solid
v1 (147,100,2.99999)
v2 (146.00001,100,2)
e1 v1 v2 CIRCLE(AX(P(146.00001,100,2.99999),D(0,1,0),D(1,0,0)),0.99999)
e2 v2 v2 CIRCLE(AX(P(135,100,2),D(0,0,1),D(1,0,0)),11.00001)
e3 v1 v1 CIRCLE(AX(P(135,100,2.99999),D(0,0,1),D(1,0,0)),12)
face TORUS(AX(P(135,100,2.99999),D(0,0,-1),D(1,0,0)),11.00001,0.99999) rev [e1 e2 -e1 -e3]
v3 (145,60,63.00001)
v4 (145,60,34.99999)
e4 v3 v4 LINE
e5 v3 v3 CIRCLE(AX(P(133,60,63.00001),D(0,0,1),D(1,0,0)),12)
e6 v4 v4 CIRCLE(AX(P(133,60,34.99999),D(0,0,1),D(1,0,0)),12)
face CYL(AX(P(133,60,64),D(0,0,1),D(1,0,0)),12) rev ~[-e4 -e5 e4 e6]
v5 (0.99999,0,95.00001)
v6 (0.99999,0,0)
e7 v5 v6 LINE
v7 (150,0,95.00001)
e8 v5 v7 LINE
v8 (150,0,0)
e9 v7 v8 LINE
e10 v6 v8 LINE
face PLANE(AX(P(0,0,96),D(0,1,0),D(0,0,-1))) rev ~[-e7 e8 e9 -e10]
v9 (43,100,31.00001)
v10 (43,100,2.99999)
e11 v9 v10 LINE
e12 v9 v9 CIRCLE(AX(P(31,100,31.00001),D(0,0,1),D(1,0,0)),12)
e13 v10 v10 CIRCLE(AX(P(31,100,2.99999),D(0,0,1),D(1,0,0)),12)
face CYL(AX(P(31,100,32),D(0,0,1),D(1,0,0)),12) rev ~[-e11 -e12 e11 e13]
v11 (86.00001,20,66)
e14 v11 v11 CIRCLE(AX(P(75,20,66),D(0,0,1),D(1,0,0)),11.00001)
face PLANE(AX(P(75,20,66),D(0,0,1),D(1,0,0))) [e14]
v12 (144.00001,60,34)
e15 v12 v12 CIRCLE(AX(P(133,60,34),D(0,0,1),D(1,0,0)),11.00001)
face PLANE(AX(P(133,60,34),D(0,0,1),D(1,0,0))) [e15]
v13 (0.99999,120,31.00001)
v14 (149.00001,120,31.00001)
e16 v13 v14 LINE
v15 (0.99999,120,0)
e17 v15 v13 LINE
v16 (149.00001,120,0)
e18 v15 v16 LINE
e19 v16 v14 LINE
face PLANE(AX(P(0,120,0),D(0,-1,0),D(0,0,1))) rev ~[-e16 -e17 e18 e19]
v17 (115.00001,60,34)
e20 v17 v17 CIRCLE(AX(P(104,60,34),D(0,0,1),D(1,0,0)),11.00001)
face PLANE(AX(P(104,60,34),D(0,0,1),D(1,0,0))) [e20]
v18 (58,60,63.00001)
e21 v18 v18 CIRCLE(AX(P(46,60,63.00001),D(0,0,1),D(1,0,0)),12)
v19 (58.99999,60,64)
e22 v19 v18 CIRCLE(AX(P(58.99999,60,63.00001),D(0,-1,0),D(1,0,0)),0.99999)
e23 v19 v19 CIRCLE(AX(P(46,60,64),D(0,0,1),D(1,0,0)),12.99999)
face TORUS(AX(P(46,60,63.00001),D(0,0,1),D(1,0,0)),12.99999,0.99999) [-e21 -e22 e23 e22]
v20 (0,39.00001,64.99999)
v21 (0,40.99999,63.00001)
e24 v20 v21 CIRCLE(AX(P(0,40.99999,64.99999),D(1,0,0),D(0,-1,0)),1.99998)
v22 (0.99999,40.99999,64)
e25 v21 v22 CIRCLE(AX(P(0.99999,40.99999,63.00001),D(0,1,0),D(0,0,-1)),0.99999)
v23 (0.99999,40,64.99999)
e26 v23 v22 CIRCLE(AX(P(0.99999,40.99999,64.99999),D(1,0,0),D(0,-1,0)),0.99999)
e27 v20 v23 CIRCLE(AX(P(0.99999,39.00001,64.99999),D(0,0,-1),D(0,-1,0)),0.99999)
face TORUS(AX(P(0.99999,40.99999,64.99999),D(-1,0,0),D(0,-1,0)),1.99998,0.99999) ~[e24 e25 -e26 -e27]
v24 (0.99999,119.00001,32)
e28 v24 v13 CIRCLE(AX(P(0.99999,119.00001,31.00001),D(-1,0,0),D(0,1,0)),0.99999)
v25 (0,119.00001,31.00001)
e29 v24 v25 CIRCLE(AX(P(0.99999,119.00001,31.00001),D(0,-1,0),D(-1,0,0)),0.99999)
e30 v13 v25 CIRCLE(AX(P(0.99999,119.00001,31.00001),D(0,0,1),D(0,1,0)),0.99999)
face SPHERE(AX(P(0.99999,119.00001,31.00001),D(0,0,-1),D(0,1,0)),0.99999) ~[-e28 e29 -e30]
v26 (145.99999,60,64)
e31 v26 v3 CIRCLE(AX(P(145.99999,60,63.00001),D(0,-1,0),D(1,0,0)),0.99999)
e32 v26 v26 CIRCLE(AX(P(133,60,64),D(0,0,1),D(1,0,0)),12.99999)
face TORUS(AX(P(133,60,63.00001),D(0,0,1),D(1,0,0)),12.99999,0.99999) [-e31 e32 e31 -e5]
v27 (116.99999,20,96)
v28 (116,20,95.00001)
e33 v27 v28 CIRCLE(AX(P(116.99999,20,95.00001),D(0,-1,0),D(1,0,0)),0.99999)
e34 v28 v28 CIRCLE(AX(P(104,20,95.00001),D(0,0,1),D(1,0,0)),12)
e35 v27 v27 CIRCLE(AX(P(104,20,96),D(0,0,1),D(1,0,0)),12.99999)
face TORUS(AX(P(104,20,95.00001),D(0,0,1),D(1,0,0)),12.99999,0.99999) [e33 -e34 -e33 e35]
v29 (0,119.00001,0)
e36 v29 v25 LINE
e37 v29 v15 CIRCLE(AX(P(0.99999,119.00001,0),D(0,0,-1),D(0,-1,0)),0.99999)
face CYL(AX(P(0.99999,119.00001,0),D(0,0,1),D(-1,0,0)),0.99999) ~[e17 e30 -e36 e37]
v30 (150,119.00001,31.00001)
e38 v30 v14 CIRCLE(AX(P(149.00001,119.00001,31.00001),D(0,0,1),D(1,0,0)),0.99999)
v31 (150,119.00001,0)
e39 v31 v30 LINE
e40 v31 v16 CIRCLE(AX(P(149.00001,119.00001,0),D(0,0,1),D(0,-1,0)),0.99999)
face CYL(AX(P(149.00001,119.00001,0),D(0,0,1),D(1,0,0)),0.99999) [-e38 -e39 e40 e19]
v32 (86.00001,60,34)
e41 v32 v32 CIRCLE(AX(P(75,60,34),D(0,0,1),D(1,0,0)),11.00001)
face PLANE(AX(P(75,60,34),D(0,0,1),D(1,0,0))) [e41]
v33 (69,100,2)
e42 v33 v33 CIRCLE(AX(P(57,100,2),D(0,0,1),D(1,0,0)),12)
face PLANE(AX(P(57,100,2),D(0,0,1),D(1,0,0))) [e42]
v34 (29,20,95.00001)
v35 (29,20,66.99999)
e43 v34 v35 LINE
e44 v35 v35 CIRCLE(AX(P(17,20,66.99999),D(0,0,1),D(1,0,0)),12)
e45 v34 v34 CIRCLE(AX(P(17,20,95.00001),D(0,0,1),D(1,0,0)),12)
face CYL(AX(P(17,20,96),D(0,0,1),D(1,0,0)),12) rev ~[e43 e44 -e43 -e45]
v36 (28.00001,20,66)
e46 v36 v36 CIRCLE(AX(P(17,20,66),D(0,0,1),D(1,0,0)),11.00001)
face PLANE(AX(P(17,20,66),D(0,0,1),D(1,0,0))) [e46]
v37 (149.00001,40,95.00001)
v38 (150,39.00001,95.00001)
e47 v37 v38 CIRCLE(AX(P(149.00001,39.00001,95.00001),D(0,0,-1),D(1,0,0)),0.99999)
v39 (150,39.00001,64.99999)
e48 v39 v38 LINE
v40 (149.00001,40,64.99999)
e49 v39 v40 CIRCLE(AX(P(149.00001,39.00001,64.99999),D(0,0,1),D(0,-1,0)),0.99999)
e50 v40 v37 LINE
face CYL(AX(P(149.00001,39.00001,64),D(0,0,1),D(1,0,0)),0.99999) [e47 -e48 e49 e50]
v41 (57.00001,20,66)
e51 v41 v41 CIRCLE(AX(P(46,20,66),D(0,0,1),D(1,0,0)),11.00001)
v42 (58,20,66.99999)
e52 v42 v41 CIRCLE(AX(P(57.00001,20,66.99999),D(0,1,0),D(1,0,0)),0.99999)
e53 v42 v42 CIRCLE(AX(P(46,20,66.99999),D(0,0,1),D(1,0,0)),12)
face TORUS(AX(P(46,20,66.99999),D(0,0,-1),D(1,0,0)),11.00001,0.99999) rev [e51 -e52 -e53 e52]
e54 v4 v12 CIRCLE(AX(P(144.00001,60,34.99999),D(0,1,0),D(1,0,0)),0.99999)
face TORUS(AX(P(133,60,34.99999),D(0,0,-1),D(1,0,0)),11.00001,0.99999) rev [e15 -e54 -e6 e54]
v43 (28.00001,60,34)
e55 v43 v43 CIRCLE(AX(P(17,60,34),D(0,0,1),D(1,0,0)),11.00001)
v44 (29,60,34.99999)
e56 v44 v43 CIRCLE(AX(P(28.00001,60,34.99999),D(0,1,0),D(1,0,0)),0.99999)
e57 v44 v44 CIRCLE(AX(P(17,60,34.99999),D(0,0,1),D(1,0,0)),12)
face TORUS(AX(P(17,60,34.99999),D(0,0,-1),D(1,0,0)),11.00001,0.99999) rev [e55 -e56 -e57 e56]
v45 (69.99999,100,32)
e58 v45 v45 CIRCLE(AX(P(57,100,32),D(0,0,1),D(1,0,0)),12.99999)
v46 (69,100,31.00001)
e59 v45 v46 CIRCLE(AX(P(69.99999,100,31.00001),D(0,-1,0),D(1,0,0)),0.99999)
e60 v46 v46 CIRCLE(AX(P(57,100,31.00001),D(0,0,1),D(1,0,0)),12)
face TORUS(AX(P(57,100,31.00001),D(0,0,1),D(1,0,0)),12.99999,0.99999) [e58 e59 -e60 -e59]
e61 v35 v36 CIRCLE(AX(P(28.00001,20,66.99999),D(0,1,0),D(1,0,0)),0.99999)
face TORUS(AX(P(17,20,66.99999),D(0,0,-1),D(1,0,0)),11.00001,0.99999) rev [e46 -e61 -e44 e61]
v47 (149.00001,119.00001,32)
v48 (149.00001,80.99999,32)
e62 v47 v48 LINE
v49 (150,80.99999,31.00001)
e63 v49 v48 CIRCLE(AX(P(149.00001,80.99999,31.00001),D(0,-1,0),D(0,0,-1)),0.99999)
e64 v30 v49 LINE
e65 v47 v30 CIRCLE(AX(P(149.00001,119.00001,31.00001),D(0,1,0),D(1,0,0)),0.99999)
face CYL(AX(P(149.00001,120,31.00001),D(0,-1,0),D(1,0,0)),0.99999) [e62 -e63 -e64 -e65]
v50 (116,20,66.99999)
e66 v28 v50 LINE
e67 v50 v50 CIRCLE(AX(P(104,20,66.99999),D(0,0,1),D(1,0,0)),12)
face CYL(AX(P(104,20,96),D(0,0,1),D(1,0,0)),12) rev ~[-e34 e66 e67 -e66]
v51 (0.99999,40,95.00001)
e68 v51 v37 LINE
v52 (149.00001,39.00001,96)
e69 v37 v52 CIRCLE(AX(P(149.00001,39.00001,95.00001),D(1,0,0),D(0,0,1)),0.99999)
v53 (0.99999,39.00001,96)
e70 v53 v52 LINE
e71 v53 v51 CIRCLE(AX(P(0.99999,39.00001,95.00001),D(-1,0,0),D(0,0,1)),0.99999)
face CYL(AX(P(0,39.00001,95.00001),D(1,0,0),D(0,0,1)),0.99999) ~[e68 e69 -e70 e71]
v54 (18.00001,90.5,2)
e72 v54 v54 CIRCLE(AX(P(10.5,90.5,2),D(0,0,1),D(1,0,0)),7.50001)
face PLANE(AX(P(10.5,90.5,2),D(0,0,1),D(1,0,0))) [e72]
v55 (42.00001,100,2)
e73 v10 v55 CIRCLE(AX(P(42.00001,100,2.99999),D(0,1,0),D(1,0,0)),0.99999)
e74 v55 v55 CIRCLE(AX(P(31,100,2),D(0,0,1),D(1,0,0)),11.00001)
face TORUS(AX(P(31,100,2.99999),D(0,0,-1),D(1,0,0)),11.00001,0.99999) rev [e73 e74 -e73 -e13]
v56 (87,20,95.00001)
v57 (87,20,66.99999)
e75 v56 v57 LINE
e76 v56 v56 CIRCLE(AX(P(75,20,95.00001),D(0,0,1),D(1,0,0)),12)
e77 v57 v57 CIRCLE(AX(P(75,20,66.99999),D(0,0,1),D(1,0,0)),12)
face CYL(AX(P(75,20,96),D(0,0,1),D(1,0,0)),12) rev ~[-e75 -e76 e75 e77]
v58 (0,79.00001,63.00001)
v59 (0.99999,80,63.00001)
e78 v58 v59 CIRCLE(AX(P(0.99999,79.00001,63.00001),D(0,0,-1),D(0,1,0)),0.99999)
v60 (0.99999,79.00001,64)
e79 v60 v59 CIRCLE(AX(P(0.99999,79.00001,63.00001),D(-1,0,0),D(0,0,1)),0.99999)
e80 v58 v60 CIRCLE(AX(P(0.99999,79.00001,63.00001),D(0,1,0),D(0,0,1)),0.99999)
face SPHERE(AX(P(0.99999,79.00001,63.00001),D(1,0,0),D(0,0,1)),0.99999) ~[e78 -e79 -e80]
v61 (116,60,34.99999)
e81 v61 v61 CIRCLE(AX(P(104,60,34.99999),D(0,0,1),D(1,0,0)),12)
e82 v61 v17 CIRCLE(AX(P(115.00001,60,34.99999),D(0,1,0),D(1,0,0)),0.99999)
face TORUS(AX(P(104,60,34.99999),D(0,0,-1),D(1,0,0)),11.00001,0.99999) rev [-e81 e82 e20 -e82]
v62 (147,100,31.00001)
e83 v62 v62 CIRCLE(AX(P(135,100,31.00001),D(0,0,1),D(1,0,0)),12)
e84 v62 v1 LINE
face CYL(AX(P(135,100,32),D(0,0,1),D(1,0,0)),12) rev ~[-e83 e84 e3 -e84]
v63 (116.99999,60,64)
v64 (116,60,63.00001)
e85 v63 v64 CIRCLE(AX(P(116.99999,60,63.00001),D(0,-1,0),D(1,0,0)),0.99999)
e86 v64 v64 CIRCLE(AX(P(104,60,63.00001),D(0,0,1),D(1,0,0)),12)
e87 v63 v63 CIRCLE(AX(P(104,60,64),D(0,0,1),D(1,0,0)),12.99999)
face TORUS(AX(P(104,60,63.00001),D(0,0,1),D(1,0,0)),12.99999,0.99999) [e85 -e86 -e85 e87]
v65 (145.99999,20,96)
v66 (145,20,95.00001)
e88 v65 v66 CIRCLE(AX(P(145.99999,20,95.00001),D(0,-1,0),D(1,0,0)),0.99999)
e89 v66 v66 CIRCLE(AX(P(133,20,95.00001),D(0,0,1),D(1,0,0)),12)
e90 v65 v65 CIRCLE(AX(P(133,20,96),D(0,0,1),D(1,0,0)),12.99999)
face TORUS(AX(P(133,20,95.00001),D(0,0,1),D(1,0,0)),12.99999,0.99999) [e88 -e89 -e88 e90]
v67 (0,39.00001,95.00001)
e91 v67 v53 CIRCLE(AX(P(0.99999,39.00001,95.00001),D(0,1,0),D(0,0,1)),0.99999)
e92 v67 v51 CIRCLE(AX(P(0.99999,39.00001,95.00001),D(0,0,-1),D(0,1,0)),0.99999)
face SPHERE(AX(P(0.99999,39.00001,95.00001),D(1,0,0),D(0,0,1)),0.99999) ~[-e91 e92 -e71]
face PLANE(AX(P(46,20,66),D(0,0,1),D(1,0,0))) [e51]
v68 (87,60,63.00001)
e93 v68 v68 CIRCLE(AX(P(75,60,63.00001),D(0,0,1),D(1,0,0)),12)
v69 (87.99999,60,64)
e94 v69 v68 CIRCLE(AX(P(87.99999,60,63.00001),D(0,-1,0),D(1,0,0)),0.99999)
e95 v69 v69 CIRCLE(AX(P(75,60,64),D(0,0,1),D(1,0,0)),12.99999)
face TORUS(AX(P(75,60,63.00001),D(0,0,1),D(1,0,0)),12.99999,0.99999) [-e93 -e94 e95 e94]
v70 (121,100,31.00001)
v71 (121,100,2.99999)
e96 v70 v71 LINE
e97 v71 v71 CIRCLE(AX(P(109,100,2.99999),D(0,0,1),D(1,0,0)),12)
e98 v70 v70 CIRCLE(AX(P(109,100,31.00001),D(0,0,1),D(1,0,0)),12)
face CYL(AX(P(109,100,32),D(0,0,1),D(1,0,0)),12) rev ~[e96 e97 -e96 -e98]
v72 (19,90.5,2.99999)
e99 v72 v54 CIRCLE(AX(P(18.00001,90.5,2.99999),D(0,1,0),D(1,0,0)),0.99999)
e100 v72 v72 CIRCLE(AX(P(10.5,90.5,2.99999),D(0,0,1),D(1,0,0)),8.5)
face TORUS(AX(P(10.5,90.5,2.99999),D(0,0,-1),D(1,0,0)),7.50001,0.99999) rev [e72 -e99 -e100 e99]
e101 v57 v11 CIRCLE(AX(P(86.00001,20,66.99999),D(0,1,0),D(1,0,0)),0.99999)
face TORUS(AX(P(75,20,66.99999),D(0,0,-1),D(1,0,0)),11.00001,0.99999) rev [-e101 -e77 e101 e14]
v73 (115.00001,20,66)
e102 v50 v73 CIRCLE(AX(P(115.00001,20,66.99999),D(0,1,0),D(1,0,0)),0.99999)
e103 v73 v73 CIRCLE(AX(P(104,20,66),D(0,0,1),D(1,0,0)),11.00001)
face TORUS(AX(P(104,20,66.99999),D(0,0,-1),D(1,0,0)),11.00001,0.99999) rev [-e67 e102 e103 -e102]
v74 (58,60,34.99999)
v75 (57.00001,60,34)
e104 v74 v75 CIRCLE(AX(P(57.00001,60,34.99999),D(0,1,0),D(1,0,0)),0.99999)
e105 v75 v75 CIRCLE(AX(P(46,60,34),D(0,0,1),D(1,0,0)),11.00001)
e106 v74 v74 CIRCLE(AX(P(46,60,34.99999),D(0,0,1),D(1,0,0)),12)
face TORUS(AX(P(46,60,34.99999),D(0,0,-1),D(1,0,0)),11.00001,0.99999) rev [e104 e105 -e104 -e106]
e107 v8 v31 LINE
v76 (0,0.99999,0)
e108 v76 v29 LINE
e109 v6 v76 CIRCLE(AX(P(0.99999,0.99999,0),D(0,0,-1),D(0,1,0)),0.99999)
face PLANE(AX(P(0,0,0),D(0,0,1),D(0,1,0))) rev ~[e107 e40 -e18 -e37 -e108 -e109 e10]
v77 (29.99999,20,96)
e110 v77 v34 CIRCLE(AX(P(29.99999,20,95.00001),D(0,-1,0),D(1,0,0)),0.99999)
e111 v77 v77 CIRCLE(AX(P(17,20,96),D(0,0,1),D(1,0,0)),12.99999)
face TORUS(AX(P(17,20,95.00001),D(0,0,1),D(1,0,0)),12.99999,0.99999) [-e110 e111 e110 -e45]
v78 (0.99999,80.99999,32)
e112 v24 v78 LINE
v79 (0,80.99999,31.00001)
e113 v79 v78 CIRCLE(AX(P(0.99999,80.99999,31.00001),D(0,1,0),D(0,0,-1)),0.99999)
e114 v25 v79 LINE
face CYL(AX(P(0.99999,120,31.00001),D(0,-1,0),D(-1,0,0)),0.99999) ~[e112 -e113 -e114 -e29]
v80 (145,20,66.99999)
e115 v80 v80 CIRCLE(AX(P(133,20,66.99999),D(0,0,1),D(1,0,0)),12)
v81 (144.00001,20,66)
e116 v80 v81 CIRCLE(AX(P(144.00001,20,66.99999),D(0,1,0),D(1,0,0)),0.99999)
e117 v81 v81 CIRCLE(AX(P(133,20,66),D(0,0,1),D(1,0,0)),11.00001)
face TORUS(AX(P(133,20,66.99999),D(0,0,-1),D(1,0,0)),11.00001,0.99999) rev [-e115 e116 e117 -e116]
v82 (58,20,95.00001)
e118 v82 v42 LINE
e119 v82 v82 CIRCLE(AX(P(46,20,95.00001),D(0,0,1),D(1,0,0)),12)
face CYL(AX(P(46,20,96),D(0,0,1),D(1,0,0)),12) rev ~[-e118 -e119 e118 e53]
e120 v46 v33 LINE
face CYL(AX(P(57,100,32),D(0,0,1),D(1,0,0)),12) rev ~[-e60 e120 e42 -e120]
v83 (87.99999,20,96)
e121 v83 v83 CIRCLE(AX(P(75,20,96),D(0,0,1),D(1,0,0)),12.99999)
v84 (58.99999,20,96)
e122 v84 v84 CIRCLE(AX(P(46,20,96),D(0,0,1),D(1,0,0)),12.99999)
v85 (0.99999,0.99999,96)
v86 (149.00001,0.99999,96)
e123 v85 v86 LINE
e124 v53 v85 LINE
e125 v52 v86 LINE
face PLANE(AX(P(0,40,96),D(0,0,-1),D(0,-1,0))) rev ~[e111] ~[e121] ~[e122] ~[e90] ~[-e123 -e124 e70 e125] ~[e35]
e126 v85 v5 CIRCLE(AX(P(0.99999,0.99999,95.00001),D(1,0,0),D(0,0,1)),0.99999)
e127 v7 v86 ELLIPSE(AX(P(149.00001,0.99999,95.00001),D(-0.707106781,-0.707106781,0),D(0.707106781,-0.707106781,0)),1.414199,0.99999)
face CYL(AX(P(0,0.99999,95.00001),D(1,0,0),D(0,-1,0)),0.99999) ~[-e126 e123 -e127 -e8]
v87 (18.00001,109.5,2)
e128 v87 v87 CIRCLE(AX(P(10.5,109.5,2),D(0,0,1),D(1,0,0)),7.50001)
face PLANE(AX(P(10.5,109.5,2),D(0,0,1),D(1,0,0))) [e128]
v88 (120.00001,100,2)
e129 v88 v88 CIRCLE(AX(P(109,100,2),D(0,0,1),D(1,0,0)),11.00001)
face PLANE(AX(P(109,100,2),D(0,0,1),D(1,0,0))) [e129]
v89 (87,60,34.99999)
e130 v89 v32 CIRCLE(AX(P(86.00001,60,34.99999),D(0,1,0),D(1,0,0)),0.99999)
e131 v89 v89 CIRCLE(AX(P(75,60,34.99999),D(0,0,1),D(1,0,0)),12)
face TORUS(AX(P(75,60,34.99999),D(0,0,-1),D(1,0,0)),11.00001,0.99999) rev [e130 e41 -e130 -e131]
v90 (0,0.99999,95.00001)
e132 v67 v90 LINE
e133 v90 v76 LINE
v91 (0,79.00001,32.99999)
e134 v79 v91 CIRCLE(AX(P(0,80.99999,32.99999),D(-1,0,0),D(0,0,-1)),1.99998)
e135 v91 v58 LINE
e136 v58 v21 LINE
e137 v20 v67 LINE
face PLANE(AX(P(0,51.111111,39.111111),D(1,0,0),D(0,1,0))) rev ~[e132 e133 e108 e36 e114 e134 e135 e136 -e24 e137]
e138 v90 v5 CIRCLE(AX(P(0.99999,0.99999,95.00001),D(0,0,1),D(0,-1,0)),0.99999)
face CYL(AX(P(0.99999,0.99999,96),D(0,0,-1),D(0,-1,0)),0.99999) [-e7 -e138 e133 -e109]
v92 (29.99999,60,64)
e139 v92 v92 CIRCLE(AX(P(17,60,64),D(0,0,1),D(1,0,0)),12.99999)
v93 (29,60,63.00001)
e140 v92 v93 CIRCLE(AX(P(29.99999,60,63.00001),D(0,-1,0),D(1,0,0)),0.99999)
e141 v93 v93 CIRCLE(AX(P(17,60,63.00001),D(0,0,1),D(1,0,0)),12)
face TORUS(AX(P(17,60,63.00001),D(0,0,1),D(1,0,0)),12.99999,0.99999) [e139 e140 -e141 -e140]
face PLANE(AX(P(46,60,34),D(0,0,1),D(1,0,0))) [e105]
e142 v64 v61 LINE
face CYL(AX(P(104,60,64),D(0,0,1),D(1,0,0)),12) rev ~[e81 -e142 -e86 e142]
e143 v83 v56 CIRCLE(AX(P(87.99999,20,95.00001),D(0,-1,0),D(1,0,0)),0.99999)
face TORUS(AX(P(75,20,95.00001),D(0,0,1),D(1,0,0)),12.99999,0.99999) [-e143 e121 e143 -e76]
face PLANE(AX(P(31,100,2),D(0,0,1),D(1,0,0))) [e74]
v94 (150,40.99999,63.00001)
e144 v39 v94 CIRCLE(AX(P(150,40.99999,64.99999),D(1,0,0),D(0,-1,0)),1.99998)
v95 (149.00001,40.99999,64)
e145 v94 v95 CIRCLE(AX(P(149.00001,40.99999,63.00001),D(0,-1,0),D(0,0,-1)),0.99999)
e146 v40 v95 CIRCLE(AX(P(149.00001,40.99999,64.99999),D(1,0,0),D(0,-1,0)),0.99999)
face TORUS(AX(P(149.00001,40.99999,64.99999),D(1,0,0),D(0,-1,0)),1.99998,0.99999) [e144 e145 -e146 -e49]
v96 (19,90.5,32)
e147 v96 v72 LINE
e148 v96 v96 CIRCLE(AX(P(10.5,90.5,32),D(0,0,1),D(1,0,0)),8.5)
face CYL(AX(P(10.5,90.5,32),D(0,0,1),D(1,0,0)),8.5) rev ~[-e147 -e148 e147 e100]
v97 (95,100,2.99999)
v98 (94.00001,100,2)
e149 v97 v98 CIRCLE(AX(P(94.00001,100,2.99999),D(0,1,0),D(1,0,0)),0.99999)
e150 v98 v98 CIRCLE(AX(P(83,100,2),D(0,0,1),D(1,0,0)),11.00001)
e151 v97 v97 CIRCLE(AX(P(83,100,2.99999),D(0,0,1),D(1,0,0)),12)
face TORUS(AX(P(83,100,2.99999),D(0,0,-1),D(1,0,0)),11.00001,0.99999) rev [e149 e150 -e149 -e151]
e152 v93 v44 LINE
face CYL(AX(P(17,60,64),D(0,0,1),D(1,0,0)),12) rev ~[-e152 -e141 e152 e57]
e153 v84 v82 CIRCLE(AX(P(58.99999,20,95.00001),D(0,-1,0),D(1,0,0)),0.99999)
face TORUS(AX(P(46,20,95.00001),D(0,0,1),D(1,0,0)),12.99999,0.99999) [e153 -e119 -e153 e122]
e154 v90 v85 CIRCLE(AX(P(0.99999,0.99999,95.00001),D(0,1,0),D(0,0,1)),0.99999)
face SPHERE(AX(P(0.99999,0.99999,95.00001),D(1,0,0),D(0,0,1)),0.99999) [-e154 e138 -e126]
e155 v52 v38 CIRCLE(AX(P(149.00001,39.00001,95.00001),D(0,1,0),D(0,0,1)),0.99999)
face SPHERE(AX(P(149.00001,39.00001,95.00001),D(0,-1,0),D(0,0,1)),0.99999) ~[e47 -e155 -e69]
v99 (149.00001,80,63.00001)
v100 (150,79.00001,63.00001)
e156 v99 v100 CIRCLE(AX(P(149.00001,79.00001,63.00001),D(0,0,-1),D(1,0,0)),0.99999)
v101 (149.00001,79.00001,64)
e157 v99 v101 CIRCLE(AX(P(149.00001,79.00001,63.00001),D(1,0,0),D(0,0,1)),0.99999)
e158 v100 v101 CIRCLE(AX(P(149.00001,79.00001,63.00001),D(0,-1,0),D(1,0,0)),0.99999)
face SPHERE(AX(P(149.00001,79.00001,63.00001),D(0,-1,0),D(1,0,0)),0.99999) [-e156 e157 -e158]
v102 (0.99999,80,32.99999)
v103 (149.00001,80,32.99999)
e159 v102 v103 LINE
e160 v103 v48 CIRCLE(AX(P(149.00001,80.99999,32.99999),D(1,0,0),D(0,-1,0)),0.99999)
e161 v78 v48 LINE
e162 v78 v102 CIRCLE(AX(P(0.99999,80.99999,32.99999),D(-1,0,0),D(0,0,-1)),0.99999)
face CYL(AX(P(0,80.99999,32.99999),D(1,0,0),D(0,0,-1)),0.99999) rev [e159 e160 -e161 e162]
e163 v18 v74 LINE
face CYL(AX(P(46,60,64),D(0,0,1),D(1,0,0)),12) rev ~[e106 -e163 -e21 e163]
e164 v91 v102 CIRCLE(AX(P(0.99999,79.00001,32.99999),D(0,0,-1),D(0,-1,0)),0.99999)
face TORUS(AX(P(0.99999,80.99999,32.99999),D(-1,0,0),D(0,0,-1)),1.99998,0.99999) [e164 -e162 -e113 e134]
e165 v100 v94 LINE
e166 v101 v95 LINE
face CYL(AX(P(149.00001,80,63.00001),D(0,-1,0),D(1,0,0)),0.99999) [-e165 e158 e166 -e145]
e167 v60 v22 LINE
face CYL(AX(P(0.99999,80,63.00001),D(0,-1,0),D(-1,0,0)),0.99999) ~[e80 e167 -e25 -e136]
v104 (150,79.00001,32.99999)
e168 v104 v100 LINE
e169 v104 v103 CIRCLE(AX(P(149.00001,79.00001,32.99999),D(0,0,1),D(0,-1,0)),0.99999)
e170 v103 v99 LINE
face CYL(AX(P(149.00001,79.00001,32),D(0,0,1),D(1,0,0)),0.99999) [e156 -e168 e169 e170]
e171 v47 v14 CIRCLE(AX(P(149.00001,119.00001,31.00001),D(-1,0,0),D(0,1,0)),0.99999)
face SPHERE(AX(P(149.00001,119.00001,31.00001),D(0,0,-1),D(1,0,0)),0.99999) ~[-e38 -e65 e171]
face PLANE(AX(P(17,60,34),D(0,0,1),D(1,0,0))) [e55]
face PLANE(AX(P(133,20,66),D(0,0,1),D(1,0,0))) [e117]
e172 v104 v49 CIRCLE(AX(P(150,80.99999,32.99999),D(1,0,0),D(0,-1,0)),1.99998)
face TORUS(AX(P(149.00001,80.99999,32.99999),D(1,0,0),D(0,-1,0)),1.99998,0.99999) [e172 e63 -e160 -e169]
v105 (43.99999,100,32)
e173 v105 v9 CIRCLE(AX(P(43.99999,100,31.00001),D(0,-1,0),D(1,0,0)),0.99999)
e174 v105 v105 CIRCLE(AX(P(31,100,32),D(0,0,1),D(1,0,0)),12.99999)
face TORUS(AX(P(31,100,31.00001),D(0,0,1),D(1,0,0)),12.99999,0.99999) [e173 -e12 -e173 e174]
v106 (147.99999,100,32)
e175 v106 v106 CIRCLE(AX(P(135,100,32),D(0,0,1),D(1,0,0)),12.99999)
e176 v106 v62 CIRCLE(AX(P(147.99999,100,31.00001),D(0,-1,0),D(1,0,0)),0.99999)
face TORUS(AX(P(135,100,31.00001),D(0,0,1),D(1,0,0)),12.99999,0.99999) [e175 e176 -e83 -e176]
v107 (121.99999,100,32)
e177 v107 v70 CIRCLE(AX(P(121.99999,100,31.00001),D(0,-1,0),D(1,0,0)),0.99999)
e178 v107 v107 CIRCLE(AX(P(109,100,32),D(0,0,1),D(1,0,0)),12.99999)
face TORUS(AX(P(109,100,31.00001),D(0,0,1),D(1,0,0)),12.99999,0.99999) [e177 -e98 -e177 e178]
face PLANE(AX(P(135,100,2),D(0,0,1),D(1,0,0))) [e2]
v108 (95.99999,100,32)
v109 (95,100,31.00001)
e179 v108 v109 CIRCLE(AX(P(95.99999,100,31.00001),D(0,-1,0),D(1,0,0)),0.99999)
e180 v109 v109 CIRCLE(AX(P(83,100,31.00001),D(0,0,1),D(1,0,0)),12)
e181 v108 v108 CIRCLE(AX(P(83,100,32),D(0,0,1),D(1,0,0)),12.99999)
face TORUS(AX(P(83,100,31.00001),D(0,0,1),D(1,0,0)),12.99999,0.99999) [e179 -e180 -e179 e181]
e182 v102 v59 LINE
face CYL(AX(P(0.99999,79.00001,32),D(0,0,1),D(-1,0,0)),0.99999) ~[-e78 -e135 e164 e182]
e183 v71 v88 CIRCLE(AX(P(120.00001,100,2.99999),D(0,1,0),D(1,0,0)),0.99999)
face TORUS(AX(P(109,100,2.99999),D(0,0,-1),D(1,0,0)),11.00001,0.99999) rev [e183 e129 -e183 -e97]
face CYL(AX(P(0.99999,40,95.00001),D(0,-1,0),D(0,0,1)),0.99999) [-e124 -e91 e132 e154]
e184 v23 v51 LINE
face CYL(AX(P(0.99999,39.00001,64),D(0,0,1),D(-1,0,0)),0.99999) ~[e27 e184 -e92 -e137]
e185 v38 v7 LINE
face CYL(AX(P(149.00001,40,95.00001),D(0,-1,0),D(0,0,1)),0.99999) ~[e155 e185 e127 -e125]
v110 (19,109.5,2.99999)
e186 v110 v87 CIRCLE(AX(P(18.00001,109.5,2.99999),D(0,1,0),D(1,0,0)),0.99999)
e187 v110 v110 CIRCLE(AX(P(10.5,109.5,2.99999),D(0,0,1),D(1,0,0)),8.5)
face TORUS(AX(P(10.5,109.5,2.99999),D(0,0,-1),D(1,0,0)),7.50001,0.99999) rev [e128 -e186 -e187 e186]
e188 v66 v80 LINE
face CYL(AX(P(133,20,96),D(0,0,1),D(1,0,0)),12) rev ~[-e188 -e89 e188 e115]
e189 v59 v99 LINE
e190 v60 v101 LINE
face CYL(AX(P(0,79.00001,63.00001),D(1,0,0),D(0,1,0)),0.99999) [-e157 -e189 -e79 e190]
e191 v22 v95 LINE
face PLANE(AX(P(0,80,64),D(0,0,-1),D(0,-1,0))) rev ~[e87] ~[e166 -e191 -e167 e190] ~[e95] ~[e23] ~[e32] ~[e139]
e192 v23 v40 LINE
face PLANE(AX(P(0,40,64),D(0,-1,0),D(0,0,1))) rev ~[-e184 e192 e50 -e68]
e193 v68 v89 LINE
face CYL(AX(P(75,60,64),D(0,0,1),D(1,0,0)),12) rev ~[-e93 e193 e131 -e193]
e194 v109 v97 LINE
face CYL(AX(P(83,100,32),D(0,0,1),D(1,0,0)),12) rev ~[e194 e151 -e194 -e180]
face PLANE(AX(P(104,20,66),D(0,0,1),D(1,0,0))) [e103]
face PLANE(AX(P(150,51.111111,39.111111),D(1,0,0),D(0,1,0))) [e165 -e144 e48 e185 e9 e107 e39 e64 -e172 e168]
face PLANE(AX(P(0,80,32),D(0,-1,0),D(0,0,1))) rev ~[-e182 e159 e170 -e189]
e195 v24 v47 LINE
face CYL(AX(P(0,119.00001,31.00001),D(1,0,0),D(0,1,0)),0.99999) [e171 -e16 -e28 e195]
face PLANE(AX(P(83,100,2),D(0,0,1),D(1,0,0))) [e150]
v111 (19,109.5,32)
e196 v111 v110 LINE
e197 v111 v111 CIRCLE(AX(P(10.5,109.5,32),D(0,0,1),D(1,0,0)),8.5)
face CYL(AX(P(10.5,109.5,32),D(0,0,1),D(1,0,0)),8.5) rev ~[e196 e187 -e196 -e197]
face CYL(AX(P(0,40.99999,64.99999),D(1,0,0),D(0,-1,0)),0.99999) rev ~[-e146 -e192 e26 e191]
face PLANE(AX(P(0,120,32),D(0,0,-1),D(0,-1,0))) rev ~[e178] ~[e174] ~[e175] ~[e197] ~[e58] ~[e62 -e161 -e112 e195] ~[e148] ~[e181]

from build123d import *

# Parameters (mm, degrees)
F1_DEPTH = 150
F2_R     = 12
F3_R     = 12
F4_DEPTH = 30
F5_R     = 12
F5_R_2   = 8.5
F6_DEPTH = 30
F7_R     = 0.99999


# Not quite as in the source:
# - a fillet or chamfer is up to 0.001 mm smaller than in the source, because OpenCascade refuses the exact size


with BuildPart() as f1:
    # F0 (on Right) → F1 (new body)
    with BuildSketch(Plane.YZ):
        Polygon((0, 96), (0, 0), (120, 0), (120, 32), (80, 32), (80, 64), (40, 64), (40, 96), align=None)
    extrude(amount=F1_DEPTH)

    # F2 (on face) + F3 (on face) → F4 (cut)
    with BuildSketch(Plane.XY.offset(96)):
        with Locations((133, 20)):
            Circle(F2_R)
        with Locations((104, 20)):
            Circle(F2_R)
        with Locations((75, 20)):
            Circle(F2_R)
        with Locations((46, 20)):
            Circle(F2_R)
        with Locations((17, 20)):
            Circle(F2_R)
    with BuildSketch(Plane.XY.offset(64)):
        with Locations((17, 60)):
            Circle(F3_R)
        with Locations((46, 60)):
            Circle(F3_R)
        with Locations((75, 60)):
            Circle(F3_R)
        with Locations((104, 60)):
            Circle(F3_R)
        with Locations((133, 60)):
            Circle(F3_R)
    extrude(amount=-F4_DEPTH, mode=Mode.SUBTRACT)

    # F5 (on face) → F6 (cut)
    with BuildSketch(Plane.XY.offset(32)):
        with Locations((135, 100)):
            Circle(F5_R)
        with Locations((109, 100)):
            Circle(F5_R)
        with Locations((83, 100)):
            Circle(F5_R)
        with Locations((57, 100)):
            Circle(F5_R)
        with Locations((31, 100)):
            Circle(F5_R)
        with Locations((10.5, 90.5)):
            Circle(F5_R_2)
        with Locations((10.5, 109.5)):
            Circle(F5_R_2)
    extrude(amount=-F6_DEPTH, mode=Mode.SUBTRACT)

    # F7 (radius 1 in the source; OpenCascade refuses exactly that, so slightly less here)
    f7_edges = [f1.edges().sort_by_distance(p)[0] for p in [
        (75, 0, 96),
        (150, 20, 96),
        (75, 40, 96),
        (0, 20, 96),
        (5, 20, 96),
        (34, 20, 96),
        (63, 20, 96),
        (92, 20, 96),
        (121, 20, 96),
        (150, 40, 80),
        (150, 60, 64),
        (150, 80, 48),
        (75, 80, 64),
        (75, 40, 64),
        (0, 40, 80),
        (0, 60, 64),
        (5, 60, 64),
        (34, 60, 64),
        (63, 60, 64),
        (92, 60, 64),
        (121, 60, 64),
        (0, 80, 48),
        (0, 0, 48),
        (0, 120, 16),
        (150, 120, 16),
        (150, 100, 32),
        (75, 80, 32),
        (123, 100, 32),
        (97, 100, 32),
        (95, 100, 17),
        (71, 100, 32),
        (71, 100, 2),
        (75, 120, 32),
        (45, 100, 32),
        (19, 100, 32),
        (123, 100, 2),
        (97, 100, 2),
        (19, 100, 2),
        (2, 90.5, 2),
        (2, 109.5, 2),
        (5, 60, 34),
        (34, 60, 34),
        (63, 60, 34),
        (92, 60, 34),
        (121, 60, 34),
        (5, 20, 66),
        (34, 20, 66),
        (63, 20, 66),
        (92, 20, 66),
        (121, 20, 66),
        (0, 100, 32),
    ]]
    fillet(f7_edges, radius=F7_R)


solid = f1.part
